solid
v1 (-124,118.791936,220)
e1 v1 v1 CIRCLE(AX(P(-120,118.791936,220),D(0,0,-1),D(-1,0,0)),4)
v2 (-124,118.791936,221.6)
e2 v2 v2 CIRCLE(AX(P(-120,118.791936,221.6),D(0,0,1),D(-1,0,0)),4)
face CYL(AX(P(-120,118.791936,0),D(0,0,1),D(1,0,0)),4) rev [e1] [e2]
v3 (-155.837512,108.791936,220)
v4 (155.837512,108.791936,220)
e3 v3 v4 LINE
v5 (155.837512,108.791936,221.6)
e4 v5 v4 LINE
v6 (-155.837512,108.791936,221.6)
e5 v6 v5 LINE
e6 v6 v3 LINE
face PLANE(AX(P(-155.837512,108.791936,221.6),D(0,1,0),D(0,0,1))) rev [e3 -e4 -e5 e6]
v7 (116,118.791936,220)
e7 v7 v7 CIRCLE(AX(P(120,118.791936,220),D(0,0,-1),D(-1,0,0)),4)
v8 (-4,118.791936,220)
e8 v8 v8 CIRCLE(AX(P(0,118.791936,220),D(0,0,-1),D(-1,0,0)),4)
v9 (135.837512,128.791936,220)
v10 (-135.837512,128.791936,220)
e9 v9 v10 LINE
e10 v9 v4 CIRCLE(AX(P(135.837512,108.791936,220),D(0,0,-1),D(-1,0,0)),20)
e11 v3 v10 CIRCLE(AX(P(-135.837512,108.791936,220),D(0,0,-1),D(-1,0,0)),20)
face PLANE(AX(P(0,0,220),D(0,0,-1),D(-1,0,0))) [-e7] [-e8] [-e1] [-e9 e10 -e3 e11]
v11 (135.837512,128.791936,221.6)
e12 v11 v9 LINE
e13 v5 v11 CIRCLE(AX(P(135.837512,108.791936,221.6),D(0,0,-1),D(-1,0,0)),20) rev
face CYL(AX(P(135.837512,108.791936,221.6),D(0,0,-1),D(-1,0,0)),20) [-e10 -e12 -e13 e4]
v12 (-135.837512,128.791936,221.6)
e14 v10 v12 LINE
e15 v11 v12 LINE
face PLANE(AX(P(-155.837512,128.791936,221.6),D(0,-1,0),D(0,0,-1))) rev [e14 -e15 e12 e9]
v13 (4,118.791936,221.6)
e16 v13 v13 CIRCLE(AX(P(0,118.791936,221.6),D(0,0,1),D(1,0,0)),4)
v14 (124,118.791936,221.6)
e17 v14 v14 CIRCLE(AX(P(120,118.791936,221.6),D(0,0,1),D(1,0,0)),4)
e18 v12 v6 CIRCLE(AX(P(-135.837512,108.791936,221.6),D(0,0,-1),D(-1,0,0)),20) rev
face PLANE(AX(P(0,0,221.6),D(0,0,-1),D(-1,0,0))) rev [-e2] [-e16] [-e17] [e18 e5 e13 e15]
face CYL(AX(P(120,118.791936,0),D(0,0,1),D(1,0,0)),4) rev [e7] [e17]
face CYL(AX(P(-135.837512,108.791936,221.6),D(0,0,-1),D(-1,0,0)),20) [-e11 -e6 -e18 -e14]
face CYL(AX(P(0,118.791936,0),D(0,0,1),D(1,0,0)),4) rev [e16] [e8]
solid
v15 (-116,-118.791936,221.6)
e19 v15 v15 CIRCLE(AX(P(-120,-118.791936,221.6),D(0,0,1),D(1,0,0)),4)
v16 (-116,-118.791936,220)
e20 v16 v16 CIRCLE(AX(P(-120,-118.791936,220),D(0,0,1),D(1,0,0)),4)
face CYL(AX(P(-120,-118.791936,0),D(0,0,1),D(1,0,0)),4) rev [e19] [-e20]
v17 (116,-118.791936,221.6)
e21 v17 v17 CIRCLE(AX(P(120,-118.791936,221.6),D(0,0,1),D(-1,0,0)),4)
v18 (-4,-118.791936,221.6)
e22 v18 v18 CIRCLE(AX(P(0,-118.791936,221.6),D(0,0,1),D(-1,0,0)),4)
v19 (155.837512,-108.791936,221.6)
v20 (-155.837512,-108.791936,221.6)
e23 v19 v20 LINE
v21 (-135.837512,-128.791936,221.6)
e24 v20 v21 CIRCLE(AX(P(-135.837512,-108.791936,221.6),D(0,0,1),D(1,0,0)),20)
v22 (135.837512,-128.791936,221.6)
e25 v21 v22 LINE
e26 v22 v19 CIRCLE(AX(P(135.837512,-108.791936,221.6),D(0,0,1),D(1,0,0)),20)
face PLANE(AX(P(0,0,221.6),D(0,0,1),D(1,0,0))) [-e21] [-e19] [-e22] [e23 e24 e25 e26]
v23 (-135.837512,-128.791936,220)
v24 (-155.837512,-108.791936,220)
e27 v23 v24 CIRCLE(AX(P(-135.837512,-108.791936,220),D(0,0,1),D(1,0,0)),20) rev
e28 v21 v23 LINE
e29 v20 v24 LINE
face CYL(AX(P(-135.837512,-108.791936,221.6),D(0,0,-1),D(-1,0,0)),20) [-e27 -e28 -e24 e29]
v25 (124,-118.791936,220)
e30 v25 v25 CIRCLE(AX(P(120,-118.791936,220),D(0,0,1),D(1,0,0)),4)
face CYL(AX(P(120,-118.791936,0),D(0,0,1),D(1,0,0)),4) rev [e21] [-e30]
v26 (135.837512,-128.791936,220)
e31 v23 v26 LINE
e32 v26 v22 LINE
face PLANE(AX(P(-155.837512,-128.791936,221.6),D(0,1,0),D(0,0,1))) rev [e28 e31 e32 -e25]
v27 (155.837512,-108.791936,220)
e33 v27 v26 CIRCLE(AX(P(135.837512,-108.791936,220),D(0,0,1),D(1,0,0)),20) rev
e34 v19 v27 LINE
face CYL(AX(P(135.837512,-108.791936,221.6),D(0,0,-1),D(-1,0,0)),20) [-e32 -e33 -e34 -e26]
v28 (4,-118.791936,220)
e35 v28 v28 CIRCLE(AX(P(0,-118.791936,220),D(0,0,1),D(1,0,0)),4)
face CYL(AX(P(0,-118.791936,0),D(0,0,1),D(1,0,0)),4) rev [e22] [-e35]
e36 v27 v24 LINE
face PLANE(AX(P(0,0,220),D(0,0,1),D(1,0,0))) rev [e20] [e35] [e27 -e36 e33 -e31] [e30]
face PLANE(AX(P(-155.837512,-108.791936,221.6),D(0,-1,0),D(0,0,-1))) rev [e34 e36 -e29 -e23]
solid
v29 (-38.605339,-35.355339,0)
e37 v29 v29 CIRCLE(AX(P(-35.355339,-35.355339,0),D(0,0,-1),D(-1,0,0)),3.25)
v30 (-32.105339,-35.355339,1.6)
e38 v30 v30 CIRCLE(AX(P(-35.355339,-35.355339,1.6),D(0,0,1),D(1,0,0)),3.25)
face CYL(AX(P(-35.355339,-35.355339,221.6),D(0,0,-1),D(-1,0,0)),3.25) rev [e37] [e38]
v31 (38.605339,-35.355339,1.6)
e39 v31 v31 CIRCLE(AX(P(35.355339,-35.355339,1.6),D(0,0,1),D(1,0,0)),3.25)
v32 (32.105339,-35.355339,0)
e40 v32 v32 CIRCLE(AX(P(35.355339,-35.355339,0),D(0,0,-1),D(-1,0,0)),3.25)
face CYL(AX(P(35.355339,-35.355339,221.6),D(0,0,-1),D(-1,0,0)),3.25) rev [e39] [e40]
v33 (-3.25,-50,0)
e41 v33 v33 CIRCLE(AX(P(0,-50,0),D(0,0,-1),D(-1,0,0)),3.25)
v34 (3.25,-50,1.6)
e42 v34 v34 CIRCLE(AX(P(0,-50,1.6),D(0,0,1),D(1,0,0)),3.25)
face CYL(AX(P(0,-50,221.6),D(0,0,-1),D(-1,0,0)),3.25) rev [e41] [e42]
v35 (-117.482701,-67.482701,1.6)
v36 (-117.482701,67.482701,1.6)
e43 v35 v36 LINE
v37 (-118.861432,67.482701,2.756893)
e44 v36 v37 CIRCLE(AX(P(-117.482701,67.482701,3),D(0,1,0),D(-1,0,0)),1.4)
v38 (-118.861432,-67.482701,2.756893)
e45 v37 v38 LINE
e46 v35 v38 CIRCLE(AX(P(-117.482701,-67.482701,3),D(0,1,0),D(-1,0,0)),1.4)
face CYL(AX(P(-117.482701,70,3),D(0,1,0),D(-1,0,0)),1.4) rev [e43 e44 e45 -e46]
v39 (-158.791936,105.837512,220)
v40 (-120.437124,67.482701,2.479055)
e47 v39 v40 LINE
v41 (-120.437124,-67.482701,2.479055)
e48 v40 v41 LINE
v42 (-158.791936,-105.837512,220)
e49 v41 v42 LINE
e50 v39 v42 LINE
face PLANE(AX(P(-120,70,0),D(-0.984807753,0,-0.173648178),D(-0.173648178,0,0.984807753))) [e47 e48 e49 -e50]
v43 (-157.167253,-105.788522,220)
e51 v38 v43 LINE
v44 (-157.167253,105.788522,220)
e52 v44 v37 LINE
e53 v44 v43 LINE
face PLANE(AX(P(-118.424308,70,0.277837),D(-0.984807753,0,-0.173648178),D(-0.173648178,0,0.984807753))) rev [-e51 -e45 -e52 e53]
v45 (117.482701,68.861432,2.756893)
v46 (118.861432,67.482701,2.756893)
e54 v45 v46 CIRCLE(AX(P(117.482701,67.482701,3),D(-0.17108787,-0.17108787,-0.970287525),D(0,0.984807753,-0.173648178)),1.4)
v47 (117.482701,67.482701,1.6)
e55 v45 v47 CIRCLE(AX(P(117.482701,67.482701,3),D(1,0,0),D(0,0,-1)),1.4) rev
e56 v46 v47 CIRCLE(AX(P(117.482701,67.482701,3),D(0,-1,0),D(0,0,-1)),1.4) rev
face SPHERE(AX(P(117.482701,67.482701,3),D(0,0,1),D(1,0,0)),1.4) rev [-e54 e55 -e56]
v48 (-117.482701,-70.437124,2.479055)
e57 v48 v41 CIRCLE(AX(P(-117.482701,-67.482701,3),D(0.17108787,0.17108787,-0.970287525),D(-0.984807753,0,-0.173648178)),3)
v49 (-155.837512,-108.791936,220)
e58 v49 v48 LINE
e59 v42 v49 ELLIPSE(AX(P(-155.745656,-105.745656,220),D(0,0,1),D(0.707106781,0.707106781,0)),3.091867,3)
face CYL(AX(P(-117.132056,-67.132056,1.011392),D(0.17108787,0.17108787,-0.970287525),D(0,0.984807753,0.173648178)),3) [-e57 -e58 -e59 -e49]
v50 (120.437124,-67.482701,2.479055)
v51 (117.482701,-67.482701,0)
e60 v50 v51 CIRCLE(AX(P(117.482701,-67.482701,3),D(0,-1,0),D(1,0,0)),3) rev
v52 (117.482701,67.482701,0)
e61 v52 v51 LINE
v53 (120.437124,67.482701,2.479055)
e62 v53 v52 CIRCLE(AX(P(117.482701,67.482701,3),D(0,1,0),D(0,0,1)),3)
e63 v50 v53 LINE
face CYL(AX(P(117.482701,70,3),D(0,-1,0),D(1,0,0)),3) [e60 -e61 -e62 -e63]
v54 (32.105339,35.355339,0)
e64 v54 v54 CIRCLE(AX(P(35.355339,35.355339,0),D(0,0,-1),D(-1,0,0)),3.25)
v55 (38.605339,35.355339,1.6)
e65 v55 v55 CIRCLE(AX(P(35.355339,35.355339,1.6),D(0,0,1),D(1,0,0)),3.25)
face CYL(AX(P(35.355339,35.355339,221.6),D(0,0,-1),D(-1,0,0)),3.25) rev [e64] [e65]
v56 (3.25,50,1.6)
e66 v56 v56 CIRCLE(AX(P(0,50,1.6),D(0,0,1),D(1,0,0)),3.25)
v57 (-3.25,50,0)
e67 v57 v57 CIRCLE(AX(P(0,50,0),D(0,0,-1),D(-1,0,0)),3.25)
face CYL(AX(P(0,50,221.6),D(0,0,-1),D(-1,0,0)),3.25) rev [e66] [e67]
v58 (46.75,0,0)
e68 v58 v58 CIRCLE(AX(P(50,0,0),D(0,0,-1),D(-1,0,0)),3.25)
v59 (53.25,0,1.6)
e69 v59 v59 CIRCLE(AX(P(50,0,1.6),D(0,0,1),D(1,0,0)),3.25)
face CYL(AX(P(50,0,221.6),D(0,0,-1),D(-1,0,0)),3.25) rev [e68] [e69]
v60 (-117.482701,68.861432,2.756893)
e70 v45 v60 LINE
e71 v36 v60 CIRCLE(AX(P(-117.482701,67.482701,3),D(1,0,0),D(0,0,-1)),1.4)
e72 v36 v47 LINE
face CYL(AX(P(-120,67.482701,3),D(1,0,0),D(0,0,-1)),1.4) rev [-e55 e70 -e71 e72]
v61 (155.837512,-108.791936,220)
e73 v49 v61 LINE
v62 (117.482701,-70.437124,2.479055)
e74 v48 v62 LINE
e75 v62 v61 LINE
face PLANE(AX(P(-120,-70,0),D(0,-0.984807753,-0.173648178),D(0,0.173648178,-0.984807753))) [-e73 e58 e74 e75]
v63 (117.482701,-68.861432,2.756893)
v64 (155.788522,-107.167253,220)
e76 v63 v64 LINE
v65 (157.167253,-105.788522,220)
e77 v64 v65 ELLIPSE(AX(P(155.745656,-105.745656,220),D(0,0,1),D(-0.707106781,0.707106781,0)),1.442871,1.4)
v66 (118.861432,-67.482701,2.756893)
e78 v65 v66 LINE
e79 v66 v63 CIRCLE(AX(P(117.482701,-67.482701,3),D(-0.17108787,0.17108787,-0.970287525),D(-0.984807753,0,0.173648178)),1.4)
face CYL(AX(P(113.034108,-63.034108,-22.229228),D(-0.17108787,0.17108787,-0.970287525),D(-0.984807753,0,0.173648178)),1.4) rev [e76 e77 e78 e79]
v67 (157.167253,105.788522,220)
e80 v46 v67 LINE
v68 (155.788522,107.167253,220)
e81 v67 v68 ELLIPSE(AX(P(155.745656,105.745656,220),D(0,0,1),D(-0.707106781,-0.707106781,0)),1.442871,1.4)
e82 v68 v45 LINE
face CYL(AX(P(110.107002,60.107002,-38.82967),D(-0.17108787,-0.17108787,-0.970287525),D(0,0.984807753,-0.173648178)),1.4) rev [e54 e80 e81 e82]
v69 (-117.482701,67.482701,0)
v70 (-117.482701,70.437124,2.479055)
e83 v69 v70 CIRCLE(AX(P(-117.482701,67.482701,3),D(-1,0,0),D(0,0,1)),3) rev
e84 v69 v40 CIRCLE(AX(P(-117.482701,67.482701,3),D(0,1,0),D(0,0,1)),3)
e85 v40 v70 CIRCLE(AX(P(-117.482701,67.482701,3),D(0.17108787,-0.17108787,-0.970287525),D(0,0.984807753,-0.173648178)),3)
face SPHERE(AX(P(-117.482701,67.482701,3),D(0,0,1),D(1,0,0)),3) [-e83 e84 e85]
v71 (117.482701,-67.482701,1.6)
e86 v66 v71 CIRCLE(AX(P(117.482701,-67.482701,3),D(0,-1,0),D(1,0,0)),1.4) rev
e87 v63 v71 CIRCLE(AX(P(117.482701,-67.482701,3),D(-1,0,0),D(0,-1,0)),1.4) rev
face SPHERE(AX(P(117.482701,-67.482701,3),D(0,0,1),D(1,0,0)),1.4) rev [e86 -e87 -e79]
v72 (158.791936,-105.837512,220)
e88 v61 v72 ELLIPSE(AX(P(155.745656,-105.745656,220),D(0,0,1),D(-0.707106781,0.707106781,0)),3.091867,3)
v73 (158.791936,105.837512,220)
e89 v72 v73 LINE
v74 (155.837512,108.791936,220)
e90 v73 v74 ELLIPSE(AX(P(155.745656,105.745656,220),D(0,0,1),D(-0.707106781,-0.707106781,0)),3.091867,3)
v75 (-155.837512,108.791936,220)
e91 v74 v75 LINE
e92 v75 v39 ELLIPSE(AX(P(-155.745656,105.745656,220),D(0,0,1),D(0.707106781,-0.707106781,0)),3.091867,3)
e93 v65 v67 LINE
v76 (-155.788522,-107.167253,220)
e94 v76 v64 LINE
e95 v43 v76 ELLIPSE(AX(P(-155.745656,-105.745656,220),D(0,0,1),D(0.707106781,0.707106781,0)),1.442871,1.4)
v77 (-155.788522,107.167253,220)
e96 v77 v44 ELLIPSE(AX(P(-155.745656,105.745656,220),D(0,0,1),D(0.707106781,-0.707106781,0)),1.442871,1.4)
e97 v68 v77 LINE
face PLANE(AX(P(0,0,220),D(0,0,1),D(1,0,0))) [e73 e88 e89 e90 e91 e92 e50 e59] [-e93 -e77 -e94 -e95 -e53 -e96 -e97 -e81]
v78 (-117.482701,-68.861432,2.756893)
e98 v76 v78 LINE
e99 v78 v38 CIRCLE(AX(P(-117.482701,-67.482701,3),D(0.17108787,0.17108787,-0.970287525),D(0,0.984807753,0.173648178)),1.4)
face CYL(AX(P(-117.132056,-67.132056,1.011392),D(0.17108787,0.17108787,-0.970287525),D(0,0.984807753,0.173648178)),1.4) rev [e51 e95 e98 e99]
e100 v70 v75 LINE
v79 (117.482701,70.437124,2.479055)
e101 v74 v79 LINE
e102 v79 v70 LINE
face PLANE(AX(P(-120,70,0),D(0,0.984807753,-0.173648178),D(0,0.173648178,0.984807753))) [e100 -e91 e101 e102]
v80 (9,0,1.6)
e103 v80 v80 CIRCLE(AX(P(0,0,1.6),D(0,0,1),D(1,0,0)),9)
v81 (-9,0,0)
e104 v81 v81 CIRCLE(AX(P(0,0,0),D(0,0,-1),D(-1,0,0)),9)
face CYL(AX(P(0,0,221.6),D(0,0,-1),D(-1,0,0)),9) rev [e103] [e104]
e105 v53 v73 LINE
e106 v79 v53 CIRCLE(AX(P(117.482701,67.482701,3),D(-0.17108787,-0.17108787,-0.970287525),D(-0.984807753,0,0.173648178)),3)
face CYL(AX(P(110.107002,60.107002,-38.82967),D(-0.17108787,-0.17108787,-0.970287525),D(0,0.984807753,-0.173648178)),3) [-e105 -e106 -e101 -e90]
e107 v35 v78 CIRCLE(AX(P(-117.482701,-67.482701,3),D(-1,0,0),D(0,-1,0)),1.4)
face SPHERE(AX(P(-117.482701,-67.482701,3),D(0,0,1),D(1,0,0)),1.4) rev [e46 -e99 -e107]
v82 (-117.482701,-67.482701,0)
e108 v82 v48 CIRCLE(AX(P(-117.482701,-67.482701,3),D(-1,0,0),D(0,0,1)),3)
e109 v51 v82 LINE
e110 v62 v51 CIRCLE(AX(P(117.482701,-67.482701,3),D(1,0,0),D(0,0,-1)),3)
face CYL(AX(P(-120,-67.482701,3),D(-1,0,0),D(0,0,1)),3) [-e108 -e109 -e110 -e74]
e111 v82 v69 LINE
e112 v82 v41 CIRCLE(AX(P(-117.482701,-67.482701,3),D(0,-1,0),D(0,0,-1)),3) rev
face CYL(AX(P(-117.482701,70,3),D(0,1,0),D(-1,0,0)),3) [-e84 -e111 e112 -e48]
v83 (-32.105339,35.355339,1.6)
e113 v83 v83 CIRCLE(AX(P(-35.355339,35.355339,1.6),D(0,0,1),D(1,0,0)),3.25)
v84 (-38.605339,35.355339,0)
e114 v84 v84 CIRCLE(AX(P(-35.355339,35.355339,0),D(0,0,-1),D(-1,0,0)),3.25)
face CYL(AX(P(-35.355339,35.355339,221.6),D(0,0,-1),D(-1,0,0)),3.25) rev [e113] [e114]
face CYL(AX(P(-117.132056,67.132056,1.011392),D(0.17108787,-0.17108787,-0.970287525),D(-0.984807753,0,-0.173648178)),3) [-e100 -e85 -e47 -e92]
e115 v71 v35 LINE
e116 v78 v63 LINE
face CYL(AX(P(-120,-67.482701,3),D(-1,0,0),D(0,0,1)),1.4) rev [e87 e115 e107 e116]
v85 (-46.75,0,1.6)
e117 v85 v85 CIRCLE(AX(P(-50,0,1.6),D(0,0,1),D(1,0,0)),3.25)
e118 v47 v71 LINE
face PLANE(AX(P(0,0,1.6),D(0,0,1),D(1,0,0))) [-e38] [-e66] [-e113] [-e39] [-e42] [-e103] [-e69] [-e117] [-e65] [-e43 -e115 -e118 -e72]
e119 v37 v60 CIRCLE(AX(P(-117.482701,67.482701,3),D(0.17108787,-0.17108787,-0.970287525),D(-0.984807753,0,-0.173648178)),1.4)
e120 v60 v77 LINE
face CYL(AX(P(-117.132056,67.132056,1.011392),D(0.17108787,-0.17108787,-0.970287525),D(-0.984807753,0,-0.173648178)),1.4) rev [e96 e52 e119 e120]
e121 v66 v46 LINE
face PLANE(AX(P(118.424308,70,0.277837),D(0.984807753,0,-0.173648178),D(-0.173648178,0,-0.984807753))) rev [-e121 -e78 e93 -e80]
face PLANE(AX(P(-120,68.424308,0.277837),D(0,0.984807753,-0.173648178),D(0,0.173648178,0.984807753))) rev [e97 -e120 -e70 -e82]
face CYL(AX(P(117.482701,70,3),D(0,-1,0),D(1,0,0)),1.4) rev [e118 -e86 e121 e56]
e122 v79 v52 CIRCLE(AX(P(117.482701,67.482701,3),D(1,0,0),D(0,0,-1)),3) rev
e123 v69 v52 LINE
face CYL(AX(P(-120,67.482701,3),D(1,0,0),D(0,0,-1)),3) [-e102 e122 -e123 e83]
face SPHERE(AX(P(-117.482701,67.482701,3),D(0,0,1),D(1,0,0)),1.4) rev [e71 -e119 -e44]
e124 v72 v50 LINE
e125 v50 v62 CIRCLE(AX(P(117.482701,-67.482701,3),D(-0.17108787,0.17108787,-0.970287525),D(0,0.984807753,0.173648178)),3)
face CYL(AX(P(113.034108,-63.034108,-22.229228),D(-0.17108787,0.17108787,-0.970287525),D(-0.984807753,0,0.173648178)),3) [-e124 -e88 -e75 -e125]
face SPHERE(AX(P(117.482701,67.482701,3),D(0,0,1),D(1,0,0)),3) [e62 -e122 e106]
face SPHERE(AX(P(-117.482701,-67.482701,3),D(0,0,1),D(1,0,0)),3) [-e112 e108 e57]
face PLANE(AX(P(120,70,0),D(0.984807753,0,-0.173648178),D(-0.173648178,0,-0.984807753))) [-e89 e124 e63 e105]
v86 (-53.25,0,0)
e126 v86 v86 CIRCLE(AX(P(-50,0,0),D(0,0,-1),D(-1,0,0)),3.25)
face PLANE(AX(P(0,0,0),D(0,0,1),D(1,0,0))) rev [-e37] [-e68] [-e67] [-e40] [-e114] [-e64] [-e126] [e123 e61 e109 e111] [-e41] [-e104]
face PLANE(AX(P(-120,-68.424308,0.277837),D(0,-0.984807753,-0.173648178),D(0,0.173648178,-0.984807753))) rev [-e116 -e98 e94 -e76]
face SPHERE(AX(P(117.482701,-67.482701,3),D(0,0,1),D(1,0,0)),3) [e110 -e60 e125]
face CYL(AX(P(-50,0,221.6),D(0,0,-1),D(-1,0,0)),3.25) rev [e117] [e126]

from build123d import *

# Parameters (mm, degrees)
CROQUIS1_W                = 240
CROQUIS1_H                = 140
SALIENTE_EXTRUIR1_DEPTH   = 220
SALIENTE_EXTRUIR1_DRAFT   = -10
REDONDEO1_R               = 3
VACIADO1_T                = -1.6
CROQUIS2_W                = 311.675024994
CROQUIS2_H                = 20
SALIENTE_EXTRUIR2_DEPTH   = 1.6
SALIENTE_EXTRUIR2_2_DEPTH = 1.6
REDONDEO2_R               = 20
REDONDEO3_R               = 20
CROQUIS3_R                = 4
CORTAR_EXTRUIR1_DEPTH     = 302.510864774
CROQUIS4_R                = 9
CROQUIS4_R_2              = 3.25
CORTAR_EXTRUIR2_DEPTH     = 302.510864774


with BuildPart() as part:
    # Croquis1 → Saliente-Extruir1 (with draft: the straight prism first)
    with BuildSketch(Plane.XY):
        Rectangle(CROQUIS1_W, CROQUIS1_H)
    extrude(amount=SALIENTE_EXTRUIR1_DEPTH)
    # Saliente-Extruir1: the draft: its side faces are tilted about the plane it starts from
    saliente_extruir1_sides = [part.faces().sort_by_distance(p)[0] for p in [
        (-120, 0, 110),
        (0, -70, 110),
        (120, 0, 110),
        (0, 70, 110),
    ]]
    draft(saliente_extruir1_sides, Plane.XY, SALIENTE_EXTRUIR1_DRAFT)

    # Redondeo1
    redondeo1_edges = [part.edges().sort_by_distance(p)[0] for p in [
        (0, -70, 0),
        (-120, 0, 0),
        (0, 70, 0),
        (120, 0, 0),
        (139.395967878, -89.395967878, 110),
        (-139.395967878, -89.395967878, 110),
        (-139.395967878, 89.395967878, 110),
        (139.395967878, 89.395967878, 110),
    ]]
    fillet(redondeo1_edges, radius=REDONDEO1_R)

    # Vaciado1
    vaciado1_openings = [part.faces().sort_by_distance(p)[0] for p in [
        (0, 0, 220),
    ]]
    offset(amount=VACIADO1_T, openings=vaciado1_openings, kind=Kind.INTERSECTION)

    # Croquis4 → Cortar-Extruir2 (cut, through all)
    with BuildSketch(Plane(origin=(0, 0, 0), x_dir=(-1, 0, 0), z_dir=(0, 0, -1))):
        Circle(CROQUIS4_R)
        with Locations((50, 0)):
            Circle(CROQUIS4_R_2)
        with Locations((35.355339059, -35.355339059)):
            Circle(CROQUIS4_R_2)
        with Locations((0, -50)):
            Circle(CROQUIS4_R_2)
        with Locations((-35.355339059, -35.355339059)):
            Circle(CROQUIS4_R_2)
        with Locations((-50, 0)):
            Circle(CROQUIS4_R_2)
        with Locations((-35.355339059, 35.355339059)):
            Circle(CROQUIS4_R_2)
        with Locations((0, 50)):
            Circle(CROQUIS4_R_2)
        with Locations((35.355339059, 35.355339059)):
            Circle(CROQUIS4_R_2)
    extrude(amount=-CORTAR_EXTRUIR2_DEPTH, mode=Mode.SUBTRACT)


with BuildPart() as body_2:
    # Croquis2 → Saliente-Extruir2 (new body)
    with BuildSketch(Plane.XY.offset(220)):
        with Locations((0, 118.791935756)):
            Rectangle(CROQUIS2_W, CROQUIS2_H)
    extrude(amount=SALIENTE_EXTRUIR2_DEPTH)

    # Redondeo2
    redondeo2_edges = [body_2.edges().sort_by_distance(p)[0] for p in [
        (-155.837512497, 128.791935756, 220.8),
        (155.837512497, 128.791935756, 220.8),
    ]]
    fillet(redondeo2_edges, radius=REDONDEO2_R - 0.0001)  # a hair under: the kernel refuses the full size


with BuildPart() as body_3:
    # Croquis2 → Saliente-Extruir2 2 (new body)
    with BuildSketch(Plane.XY.offset(220)):
        with Locations((0, -118.791935756)):
            Rectangle(CROQUIS2_W, CROQUIS2_H)
    extrude(amount=SALIENTE_EXTRUIR2_2_DEPTH)

    # Redondeo3
    redondeo3_edges = [body_3.edges().sort_by_distance(p)[0] for p in [
        (-155.837512497, -128.791935756, 220.8),
        (155.837512497, -128.791935756, 220.8),
    ]]
    fillet(redondeo3_edges, radius=REDONDEO3_R - 0.0001)  # a hair under: the kernel refuses the full size


with BuildPart() as cortar_extruir1_tool:
    # Croquis3 → Cortar-Extruir1 (new, through all)
    with BuildSketch(Plane.XY.offset(221.6)):
        with Locations((0, 118.791935756)):
            Circle(CROQUIS3_R)
        with Locations((120, 118.791935756)):
            Circle(CROQUIS3_R)
        with Locations(Location((-120, 118.791935756, 0), (0, 0, 180))):
            Circle(CROQUIS3_R)
        with Locations((120, -118.791935756)):
            Circle(CROQUIS3_R)
        with Locations((0, -118.791935756)):
            Circle(CROQUIS3_R)
        with Locations((-120, -118.791935756)):
            Circle(CROQUIS3_R)
    extrude(amount=-CORTAR_EXTRUIR1_DEPTH)


with BuildPart() as body_2_1:
    add(body_2.part)

    # Cortar-Extruir1: cut by cortar_extruir1_tool
    add(cortar_extruir1_tool.part, mode=Mode.SUBTRACT)


with BuildPart() as body_3_1:
    add(body_3.part)

    # Cortar-Extruir1: cut by cortar_extruir1_tool
    add(cortar_extruir1_tool.part, mode=Mode.SUBTRACT)


solid = Compound([part.part, body_2_1.part, body_3_1.part])
